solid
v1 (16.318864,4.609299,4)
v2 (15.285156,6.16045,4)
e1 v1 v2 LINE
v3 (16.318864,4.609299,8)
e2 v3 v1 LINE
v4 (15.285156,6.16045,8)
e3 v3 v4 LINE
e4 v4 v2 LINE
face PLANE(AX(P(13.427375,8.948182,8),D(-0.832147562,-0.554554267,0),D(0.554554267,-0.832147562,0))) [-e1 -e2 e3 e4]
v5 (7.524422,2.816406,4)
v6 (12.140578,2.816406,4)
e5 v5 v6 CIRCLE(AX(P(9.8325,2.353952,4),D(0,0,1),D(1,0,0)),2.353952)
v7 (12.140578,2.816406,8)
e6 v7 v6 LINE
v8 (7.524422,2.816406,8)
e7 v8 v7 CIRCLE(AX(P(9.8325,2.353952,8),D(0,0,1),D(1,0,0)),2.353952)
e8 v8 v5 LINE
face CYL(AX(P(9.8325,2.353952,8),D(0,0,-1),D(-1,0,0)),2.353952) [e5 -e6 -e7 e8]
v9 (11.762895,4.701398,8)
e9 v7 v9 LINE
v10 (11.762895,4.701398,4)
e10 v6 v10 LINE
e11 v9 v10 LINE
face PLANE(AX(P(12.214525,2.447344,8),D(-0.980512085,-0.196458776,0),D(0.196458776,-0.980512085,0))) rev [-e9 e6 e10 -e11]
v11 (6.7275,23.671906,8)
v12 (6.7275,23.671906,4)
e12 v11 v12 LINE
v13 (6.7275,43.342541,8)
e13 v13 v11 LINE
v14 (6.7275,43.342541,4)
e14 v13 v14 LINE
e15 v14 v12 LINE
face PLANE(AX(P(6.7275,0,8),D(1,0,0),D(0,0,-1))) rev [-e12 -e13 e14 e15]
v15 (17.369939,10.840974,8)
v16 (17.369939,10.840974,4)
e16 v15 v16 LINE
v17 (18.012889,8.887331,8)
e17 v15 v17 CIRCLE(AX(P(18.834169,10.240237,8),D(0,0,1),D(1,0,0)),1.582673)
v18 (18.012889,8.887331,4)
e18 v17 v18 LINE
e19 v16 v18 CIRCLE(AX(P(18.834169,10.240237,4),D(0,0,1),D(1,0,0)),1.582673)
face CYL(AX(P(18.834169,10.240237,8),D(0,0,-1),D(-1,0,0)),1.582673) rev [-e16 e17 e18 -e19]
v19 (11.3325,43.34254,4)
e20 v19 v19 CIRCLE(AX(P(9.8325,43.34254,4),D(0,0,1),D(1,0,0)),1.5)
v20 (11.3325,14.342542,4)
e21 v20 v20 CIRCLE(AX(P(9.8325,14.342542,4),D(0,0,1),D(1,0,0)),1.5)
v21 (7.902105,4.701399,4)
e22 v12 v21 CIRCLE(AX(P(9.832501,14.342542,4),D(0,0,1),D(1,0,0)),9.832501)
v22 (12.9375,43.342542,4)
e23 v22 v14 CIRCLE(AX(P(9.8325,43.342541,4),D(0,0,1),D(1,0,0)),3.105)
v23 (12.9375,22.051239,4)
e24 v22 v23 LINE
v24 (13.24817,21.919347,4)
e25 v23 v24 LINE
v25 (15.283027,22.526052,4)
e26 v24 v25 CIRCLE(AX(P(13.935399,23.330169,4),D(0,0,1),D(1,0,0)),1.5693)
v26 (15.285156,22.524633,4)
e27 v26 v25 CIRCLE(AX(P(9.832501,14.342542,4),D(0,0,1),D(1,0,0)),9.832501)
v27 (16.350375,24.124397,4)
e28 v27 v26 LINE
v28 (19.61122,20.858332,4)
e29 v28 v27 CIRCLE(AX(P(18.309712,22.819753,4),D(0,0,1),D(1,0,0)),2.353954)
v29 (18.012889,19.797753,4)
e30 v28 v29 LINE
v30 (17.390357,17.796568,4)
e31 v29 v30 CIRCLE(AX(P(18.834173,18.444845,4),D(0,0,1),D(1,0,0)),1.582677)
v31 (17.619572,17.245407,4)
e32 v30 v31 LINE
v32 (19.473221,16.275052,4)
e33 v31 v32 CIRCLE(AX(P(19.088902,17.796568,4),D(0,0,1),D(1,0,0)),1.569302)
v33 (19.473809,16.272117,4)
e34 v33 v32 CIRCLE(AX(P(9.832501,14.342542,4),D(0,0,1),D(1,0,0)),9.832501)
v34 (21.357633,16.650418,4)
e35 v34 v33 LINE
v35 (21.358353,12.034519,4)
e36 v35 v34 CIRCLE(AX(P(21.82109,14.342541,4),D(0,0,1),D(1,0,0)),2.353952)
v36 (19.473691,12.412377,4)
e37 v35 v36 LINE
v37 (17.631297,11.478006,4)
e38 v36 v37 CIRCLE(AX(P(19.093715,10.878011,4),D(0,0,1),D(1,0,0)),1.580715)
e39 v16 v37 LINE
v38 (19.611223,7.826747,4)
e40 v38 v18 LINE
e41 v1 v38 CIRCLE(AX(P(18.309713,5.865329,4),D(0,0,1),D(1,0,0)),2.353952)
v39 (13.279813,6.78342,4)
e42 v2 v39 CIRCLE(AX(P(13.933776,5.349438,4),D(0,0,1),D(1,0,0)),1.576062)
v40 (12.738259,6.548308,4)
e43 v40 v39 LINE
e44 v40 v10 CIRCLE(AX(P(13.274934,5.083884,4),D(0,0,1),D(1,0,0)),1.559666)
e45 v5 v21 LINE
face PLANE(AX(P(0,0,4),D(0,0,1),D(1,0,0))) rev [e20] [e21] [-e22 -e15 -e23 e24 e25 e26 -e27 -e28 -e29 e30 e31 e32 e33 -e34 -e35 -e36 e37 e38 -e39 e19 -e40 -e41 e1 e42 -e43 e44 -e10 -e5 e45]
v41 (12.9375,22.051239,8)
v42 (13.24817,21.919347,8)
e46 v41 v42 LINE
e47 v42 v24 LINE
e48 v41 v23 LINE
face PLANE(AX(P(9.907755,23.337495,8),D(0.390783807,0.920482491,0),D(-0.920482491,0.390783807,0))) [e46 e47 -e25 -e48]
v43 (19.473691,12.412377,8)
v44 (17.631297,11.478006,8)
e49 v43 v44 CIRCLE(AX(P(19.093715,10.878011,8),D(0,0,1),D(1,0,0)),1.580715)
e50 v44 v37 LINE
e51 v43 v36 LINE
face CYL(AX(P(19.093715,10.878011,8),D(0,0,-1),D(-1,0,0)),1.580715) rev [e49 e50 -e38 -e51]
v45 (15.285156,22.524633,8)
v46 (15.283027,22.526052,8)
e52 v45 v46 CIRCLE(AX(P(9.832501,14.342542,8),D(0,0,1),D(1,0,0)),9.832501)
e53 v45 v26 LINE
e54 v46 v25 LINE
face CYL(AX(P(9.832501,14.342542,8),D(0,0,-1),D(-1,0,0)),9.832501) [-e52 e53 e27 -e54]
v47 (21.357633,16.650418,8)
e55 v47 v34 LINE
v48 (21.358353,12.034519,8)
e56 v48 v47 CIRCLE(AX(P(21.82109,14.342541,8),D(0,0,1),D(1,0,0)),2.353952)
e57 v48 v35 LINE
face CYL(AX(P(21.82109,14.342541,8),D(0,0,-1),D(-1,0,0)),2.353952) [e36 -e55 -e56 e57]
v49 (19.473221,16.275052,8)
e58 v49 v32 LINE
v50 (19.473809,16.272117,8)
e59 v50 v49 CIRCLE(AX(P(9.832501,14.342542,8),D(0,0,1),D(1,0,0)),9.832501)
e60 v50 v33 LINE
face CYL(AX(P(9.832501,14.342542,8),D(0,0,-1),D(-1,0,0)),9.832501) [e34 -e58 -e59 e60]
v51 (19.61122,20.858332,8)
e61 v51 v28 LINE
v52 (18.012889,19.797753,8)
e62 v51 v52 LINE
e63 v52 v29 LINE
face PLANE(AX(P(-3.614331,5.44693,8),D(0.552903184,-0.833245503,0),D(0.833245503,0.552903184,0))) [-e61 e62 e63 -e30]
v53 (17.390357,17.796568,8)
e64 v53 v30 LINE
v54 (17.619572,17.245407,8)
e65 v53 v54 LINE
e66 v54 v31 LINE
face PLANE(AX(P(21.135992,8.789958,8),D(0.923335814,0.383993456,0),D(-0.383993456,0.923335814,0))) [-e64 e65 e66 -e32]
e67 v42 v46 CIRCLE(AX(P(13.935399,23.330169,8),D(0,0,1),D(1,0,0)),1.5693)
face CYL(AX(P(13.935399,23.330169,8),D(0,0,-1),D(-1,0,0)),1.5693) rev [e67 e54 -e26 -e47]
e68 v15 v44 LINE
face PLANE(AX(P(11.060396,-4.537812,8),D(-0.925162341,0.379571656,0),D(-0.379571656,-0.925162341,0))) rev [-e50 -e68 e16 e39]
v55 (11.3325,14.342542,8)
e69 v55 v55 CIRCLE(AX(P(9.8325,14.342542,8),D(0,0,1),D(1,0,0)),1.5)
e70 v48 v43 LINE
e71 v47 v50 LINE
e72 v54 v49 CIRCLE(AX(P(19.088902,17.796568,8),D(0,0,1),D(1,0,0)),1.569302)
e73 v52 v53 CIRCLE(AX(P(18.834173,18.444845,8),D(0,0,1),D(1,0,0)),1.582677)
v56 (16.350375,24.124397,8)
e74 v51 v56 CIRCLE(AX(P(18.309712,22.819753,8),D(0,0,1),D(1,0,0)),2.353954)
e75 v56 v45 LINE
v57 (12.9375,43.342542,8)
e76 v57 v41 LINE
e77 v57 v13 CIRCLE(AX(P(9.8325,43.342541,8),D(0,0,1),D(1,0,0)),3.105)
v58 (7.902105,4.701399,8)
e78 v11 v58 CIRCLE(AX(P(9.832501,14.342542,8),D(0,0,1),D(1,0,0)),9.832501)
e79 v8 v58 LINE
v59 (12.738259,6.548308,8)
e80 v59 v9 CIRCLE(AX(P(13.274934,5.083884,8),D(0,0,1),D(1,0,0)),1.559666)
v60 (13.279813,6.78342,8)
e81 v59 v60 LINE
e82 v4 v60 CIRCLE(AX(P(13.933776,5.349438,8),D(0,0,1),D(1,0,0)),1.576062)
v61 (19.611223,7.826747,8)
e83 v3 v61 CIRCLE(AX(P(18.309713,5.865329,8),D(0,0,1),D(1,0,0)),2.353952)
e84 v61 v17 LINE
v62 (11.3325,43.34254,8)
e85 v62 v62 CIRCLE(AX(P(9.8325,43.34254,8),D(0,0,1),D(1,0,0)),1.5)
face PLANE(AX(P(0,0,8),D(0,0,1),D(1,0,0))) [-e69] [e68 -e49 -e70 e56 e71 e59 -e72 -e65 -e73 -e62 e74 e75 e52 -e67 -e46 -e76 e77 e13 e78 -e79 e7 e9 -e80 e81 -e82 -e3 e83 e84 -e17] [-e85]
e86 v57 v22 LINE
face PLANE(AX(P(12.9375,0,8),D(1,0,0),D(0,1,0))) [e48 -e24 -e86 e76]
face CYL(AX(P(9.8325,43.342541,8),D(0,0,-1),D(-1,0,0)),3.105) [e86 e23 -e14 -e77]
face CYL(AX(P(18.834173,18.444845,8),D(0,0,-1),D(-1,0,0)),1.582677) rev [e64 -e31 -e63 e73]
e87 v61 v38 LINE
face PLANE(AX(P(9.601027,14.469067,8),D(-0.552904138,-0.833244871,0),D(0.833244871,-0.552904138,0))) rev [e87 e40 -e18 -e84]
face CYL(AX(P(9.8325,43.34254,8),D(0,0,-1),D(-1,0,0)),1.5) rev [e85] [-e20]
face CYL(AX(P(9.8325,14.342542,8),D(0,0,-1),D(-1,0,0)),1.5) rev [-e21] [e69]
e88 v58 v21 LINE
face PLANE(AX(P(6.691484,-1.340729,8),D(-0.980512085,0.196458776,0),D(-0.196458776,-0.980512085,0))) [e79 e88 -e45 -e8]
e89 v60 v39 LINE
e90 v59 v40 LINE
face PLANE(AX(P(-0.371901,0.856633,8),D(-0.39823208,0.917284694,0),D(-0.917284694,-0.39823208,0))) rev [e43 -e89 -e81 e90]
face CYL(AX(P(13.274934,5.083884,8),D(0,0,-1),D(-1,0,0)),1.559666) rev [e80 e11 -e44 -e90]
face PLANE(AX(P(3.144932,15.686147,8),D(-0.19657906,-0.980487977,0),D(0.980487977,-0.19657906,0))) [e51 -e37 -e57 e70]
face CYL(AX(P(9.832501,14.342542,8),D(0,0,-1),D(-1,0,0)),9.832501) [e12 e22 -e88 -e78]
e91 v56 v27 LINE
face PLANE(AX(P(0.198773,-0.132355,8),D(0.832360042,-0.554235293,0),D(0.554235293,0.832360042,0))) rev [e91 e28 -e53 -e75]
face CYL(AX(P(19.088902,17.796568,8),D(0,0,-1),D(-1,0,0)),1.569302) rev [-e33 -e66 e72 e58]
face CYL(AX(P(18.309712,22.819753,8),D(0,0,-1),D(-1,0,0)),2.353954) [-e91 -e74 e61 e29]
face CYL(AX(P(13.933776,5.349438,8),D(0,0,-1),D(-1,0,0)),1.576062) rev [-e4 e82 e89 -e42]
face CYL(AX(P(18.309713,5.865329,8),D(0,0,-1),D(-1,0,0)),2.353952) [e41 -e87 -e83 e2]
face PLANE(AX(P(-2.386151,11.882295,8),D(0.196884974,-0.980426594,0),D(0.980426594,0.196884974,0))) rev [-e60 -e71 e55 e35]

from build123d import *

# Parameters (mm, degrees)
SKETCH1_R           = 1.49999983
SKETCH1_R_2         = 1.50000021
BOSS_EXTRUDE5_DEPTH = 4


# Read off the part's stored shape, not the designer's step: Imported1
with BuildPart() as part:
    # Sketch1 → Boss-Extrude5 (new body)
    with BuildSketch(Plane.XY.offset(4.00000019)):
        with BuildLine():
            ThreePointArc((12.937500142, 43.342541903), (9.832499729, 46.447540761), (6.727500353, 43.342540866))
            Line((6.727500353, 43.342540866), (6.727500353, 23.671906441))
            ThreePointArc((6.727500353, 23.671906441), (0.018793936, 13.734902419), (7.902105327, 4.701398545))
            Line((7.902105327, 4.701398545), (7.524421789, 2.816406275))
            ThreePointArc((7.524421789, 2.816406275), (9.832500014, -5.9e-08), (12.14057824, 2.816406275))
            Line((12.14057824, 2.816406275), (11.762894778, 4.701398162))
            ThreePointArc((11.762894778, 4.701398162), (11.855672679, 5.730610746), (12.571502338, 6.475912151))
            ThreePointArc((12.571502338, 6.475912151), (12.653825046, 6.514541951), (12.738259166, 6.548308343))
            Line((12.738259166, 6.548308343), (13.279813023, 6.783419776))
            ThreePointArc((13.279813023, 6.783419776), (14.401344572, 6.854545961), (15.285156295, 6.160450299))
            Line((15.285156295, 6.160450299), (16.318864329, 4.609298912))
            ThreePointArc((16.318864329, 4.609298912), (19.954946163, 4.181790528), (19.61122341, 7.826747207))
            Line((19.61122341, 7.826747207), (18.012888788, 8.887330785))
            ThreePointArc((18.012888788, 8.887330785), (17.330815892, 9.745478763), (17.369938897, 10.840974441))
            Line((17.369938897, 10.840974441), (17.631297478, 11.478005982))
            ThreePointArc((17.631297478, 11.478005982), (18.378744789, 12.287790328), (19.473690584, 12.412377153))
            Line((19.473690584, 12.412377153), (21.358352668, 12.034519282))
            ThreePointArc((21.358352668, 12.034519282), (24.175042258, 14.342908104), (21.357632561, 16.650417974))
            Line((21.357632561, 16.650417974), (19.473808661, 16.272116711))
            ThreePointArc((19.473808661, 16.272116711), (19.473514795, 16.273584463), (19.473220705, 16.27505217))
            ThreePointArc((19.473220705, 16.27505217), (18.361090509, 16.40624384), (17.619571753, 17.245406971))
            Line((17.619571753, 17.245406971), (17.390357149, 17.796567545))
            ThreePointArc((17.390357149, 17.796567545), (17.322929979, 18.914964617), (18.012888788, 19.79775297))
            Line((18.012888788, 19.79775297), (19.611220282, 20.858331838))
            ThreePointArc((19.611220282, 20.858331838), (19.975539072, 24.482917782), (16.35037502, 24.124397156))
            Line((16.35037502, 24.124397156), (15.285156295, 22.524633456))
            ThreePointArc((15.285156295, 22.524633456), (15.284091495, 22.525342953), (15.283026603, 22.526052311))
            ThreePointArc((15.283026603, 22.526052311), (14.383790145, 21.826291172), (13.248170262, 21.919346761))
            Line((13.248170262, 21.919346761), (12.937500142, 22.051239386))
            Line((12.937500142, 22.051239386), (12.937500142, 23.67190695))
            Line((12.937500142, 23.67190695), (12.937500142, 43.342541903))
        make_face()
        with Locations((9.832499965, 14.342541504)):
            Circle(SKETCH1_R, mode=Mode.SUBTRACT)
        with Locations((9.832500097, 43.342539793)):
            Circle(SKETCH1_R_2, mode=Mode.SUBTRACT)
    extrude(amount=BOSS_EXTRUDE5_DEPTH)


solid = part.part
